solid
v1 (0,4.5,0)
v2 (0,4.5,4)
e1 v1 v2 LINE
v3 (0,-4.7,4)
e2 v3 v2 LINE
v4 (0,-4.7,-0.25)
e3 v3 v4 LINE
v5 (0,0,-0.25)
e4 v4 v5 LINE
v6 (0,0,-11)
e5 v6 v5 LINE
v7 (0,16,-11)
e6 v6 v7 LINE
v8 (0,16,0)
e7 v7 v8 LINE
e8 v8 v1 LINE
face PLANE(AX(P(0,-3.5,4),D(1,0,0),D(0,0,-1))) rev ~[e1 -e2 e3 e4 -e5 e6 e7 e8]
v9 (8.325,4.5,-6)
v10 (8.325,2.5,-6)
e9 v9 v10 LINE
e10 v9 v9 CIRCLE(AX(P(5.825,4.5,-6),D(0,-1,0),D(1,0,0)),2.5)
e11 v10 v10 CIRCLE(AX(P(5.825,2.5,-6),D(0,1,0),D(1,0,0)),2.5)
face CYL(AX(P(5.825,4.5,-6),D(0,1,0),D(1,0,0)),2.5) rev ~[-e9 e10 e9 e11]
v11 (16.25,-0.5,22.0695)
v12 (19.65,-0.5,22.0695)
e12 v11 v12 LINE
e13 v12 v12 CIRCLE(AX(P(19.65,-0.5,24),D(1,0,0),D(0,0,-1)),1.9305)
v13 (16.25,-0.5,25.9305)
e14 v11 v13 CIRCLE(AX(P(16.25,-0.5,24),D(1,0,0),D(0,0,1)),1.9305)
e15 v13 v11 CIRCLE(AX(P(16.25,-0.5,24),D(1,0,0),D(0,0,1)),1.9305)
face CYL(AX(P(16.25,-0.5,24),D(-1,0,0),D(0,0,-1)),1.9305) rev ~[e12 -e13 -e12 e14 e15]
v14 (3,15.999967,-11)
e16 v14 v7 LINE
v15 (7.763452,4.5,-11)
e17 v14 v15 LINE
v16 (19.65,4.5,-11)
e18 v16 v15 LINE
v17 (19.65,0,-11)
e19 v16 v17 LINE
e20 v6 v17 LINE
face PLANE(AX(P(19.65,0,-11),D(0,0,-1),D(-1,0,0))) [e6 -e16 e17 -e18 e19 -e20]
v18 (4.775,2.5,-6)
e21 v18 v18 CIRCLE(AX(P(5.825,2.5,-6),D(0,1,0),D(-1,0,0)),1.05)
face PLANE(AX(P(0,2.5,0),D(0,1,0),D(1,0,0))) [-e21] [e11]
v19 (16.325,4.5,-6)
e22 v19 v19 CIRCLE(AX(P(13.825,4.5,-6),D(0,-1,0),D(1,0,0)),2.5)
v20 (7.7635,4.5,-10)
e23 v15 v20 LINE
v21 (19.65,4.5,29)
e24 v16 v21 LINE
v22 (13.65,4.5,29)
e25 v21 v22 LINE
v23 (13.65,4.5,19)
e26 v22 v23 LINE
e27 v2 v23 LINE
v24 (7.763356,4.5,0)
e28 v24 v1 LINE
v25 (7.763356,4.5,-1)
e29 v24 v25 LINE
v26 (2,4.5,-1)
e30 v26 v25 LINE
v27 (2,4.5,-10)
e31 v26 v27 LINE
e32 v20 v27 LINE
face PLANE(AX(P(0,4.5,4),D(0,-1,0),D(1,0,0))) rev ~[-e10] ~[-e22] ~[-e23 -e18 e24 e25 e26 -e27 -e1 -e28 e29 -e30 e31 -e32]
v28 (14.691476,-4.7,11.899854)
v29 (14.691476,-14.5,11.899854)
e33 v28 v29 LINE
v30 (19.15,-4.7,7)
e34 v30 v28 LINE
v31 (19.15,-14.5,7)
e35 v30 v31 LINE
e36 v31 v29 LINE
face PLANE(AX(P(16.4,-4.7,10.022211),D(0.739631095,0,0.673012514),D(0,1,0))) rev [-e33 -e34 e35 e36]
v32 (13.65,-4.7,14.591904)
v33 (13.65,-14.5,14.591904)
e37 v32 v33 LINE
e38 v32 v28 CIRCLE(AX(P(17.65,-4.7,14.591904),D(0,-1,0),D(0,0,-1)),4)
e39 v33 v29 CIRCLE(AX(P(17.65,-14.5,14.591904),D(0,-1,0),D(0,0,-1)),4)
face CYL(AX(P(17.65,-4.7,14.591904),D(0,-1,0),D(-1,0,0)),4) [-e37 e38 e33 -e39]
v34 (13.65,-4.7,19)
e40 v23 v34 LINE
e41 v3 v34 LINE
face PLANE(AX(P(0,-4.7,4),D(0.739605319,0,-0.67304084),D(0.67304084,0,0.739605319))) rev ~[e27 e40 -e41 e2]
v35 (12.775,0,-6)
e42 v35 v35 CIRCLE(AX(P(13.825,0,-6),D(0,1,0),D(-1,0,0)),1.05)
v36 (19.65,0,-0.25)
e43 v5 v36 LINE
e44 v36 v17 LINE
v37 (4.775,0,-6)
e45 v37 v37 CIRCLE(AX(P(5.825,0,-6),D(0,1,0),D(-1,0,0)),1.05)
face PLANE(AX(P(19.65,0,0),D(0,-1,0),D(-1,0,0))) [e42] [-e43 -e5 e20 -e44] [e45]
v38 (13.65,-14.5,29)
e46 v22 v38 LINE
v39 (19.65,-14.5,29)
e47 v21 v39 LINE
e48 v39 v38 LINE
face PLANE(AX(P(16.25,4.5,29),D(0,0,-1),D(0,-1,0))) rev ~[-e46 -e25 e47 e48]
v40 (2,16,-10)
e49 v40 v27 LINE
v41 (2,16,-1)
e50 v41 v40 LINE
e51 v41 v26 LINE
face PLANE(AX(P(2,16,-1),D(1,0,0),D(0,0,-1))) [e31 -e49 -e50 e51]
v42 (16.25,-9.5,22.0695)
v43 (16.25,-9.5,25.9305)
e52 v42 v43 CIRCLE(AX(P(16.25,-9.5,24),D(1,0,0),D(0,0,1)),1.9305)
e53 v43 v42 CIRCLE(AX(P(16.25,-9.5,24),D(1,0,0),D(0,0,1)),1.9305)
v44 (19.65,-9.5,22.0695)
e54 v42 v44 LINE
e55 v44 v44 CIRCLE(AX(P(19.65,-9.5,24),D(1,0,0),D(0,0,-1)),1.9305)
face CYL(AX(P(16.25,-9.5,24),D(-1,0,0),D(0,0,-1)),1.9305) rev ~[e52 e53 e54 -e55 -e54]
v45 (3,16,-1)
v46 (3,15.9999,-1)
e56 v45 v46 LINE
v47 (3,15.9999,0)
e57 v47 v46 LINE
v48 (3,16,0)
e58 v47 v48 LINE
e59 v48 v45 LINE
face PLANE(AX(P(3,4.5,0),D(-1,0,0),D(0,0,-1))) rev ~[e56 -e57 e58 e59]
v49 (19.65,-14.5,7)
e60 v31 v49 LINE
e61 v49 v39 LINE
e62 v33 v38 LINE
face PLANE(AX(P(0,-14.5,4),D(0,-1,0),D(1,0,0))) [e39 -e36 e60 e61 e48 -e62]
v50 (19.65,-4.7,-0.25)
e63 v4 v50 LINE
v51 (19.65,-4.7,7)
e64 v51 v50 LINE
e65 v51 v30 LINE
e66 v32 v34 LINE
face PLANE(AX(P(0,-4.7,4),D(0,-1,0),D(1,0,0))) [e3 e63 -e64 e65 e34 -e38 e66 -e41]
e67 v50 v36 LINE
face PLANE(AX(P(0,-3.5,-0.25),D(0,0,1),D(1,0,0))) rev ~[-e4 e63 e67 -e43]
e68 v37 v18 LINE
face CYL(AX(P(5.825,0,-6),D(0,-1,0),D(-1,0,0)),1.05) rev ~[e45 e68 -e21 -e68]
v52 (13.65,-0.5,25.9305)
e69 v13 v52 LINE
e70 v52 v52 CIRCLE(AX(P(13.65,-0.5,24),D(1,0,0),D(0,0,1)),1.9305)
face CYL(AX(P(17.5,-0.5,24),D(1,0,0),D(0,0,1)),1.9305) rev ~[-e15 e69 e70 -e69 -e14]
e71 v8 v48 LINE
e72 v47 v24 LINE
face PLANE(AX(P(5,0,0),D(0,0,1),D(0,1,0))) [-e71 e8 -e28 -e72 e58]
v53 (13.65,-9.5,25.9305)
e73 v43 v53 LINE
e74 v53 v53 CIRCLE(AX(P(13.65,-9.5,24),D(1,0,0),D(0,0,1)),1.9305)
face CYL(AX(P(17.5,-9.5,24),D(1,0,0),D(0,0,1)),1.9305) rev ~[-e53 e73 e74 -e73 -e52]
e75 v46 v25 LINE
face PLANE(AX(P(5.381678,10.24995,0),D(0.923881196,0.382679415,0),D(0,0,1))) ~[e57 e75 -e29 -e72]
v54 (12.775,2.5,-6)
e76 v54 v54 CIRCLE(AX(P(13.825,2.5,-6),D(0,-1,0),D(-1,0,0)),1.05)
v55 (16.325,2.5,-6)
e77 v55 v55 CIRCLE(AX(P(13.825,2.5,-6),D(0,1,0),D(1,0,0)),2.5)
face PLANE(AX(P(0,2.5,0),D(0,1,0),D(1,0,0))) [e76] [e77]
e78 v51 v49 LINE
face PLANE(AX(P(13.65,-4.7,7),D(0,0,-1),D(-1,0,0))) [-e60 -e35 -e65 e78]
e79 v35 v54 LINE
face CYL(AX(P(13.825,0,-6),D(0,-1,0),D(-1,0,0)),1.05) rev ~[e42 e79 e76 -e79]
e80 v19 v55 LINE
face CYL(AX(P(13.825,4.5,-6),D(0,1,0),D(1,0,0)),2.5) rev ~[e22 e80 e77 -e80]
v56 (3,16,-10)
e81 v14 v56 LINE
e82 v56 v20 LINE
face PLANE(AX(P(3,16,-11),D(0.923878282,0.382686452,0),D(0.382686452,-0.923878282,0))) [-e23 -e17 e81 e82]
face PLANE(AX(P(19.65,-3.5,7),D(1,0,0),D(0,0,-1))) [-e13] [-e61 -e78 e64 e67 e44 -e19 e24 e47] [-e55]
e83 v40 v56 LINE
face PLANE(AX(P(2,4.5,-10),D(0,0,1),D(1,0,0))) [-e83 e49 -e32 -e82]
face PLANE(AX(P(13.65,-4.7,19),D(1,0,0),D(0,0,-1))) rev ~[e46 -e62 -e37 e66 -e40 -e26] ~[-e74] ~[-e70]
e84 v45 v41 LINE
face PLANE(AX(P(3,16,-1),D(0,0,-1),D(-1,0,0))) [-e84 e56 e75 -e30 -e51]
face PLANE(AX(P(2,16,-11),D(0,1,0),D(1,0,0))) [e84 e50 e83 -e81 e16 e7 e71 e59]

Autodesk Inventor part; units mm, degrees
ref_plane "YZ Plane" through (0, 0, 0) normal (1, 0, 0) x (0, 1, 0)
ref_plane "XZ Plane" through (0, 0, 0) normal (0, 1, 0) x (-1, 0, 0)
ref_plane "XY Plane" through (0, 0, 0) normal (0, 0, 1) x (1, 0, 0)
sketch "Sketch1" plane through (0, 0, 0) normal (0, 1, 0) x (-1, 0, 0)
  line L0 (0, 0) -> (-19.65, 0)
  line L1 (-19.65, 0) -> (-19.65, -12)
  line L2 (-19.65, -12) -> (0, -12)
  line L3 (0, -12) -> (0, 0)
  line L4 (0, 0) -> (0, -6)
  line L5 (0, -6) -> (-5.825, -6)
  line L6 (-5.825, -6) -> (-13.825, -6)
  circle A0 centre (-5.825, -6) radius 1.05
  circle A1 centre (-13.825, -6) radius 1.05
  dimension "d0" = 19.65
  dimension "d1" = 12
  dimension "d2" = 6
  dimension "d3" = 5.825
  dimension "d4" = 8
  dimension "d5" = 2.1
  dimension "d6" = 2.1
extrude "Extrusion1" add sketch "Sketch1" along normal blind 4.5
sketch "Sketch2" plane through (0, 4.5, 0) normal (0, 1, 0) x (1, 0, 0)
  line L0 (0, 0) -> (19.65, 0) projected
  line L1 (0, 0) -> (0, 6)
  line L2 (0, 12) -> (0, 0) projected
  line L3 (0, 6) -> (5.825, 6)
  line L4 (5.825, 6) -> (13.825, 6)
  circle A0 centre (5.825, 6) radius 2.5
  circle A1 centre (13.825, 6) radius 2.5
  dimension "d9" = 5.825
  dimension "d10" = 8
  dimension "d11" = 5
  dimension "d12" = 5
extrude "Extrusion2" cut sketch "Sketch2" against normal blind 2
sketch "Sketch3" plane through (0, 4.5, 0) normal (0, 1, 0) x (1, 0, 0)
  line L0 (19.65, 12) -> (0, 12) projected
  line L1 (0, 0) -> (3, 0)
  line L2 (3, 0) -> (3, 12)
  line L3 (3, 12) -> (0, 12)
  line L4 (0, 12) -> (0, 0)
  dimension "d15" = 3
extrude "Extrusion3" add sketch "Sketch3" along normal blind 11.5
sketch "Sketch4" plane through (0, 16, 0) normal (0, 1, 0) x (1, 0, 0)
  line L0 (0, 0) -> (3, 0) projected
  line L1 (0, 0) -> (3, 0)
  line L2 (3, 0) -> (3, 1)
  line L3 (3, 0) -> (3, 12) projected
  line L4 (3, 1) -> (2, 1)
  line L5 (2, 1) -> (2, 11)
  line L6 (2, 11) -> (3, 11)
  line L7 (3, 1) -> (3, 11)
  dimension "d18" = 1
  dimension "d19" = 1
  dimension "d20" = 10
extrude "Extrusion4" cut sketch "Sketch4" against normal blind 11.5
sketch "Sketch6" plane through (0, 0, 0) normal (0, 0, 1) x (1, 0, 0)
  line L0 (0, 0) -> (19.65, 0) projected
  line L1 (0, 0) -> (5, 0)
  line L2 (5, 0) -> (5, 4.5)
  line L3 (3.325, 4.5) -> (8.325, 4.5) projected
  line L4 (19.65, 0) -> (19.65, 4.5) projected
  line L5 (19.65, 4.5) -> (19.65, 0)
  line L6 (19.65, 0) -> (5, 0)
  line L7 (5, 4.5) -> (19.65, 4.5)
  line L8 (19.65, 0) -> (5, 0)
  line L9 (19.65, 4.5) -> (19.65, -3.5)
  line L10 (5, 4.5) -> (-3, 4.5)
  line L11 (3, 4.5) -> (19.65, 4.5) projected
  line L12 (5, 4.5) -> (5, -3.5)
  line L13 (5, -3.5) -> (19.65, -3.5)
  dimension "d24" = 5
  dimension "d25" = 8
  dimension "d26" = 8
  dimension "d27" = 8
extrude "Extrusion5" add sketch "Sketch6" along normal blind 2
sketch "Sketch7" plane through (0, 0, 2) normal (0, 0, 1) x (1, 0, 0)
  line L0 (5, 0) -> (5, -3.5) projected
  line L1 (5, -3.5) -> (11, -3.5)
  line L2 (11, -3.5) -> (11, 4.5)
  line L3 (11, 4.5) -> (5, 4.5)
  line L4 (5, 4.5) -> (5, -3.5)
  line L5 (5, -3.5) -> (19.65, -3.5) projected
  line L6 (5, -3.5) -> (11, -3.5)
  line L7 (11, -3.5) -> (11, -14.5)
  line L8 (11, -14.5) -> (5, -14.5)
  line L9 (5, -14.5) -> (5, -3.5)
  point P0 (0, 0)
  dimension "d30" = 6
  dimension "d31" = 8
  dimension "d32" = 6
  dimension "d33" = 11
extrude "Extrusion6" add sketch "Sketch7" along normal blind 27
sketch "Sketch8" plane through (11, -14.5, 2) normal (1, 0, 0) x (0, 0, -1)
  line L0 (0, 11) -> (0, 0) projected
  line L1 (0, 0) -> (-27, 0)
  line L2 (0, 0) -> (-27, 0) projected
  line L3 (-27, 0) -> (-27, 5)
  line L4 (2, 19) -> (-27, 19) projected
  circle A0 centre (-27, 5) radius 2
  line L5 (0, 19) -> (-27, 19)
  line L6 (-27, 19) -> (-27, 14)
  circle A1 centre (-27, 14) radius 2
  line L7 (-27, 14) -> (-22, 14)
  line L8 (-27, 5) -> (-22, 5)
  circle A2 centre (-22, 14) radius 1.9305
  circle A3 centre (-22, 5) radius 1.9305
  point P0 (2, 14.5)
  point P1 (-25, 14)
  point P2 (-27, 16)
  point P3 (-25, 5)
  point P4 (-27, 3)
  dimension "d36" = 27
  dimension "d37" = 5
  dimension "d39" = 4
  dimension "d41" = 27
  dimension "d42" = 5
  dimension "d43" = 4
  dimension "d44" = 5
  dimension "d45" = 5
  dimension "d46" = 3.861
  dimension "d47" = 3.861
sketch "Sketch10" plane through (11, -14.5, 2) normal (1, 0, 0) x (0, 0, -1)
  line L0 (0, 0) -> (-27, 0) projected
  line L1 (0, 0) -> (-5, 0)
  line L2 (-5, 0) -> (-5, 11)
  line L3 (-5, 11) -> (0, 11)
  line L4 (0, 11) -> (0, 0)
  point P0 (2, 14.5)
  point P1 (-5, 0)
  dimension "d52" = 5
  dimension "d53" = 11
extrude "Extrusion9" cut sketch "Sketch10" against normal blind 20
sketch "Sketch11" plane through (11, -3.5, 2) normal (1, 0, 0) x (0, 0, -1)
  line L0 (-27, 8) -> (0, 8)
  line L1 (0, 8) -> (0, -11)
  line L2 (0, -11) -> (-27, -11)
  line L3 (-27, -11) -> (-27, 8)
  line L4 (-5, 0) -> (0, 0) projected
  line L5 (-5, 0) -> (0, 0)
  line L6 (0, 0) -> (0, -11)
  line L7 (0, -11) -> (-5, -11)
  line L8 (-5, -11) -> (-5, 0)
  point P0 (2, 3.5)
  dimension "d56" = 27
  dimension "d57" = 19
extrude "Extrusion10" add sketch "Sketch11" along normal blind 16 contours L0 L1 L4 L8 L2 L3
sketch "Sketch13" plane through (5, -3.5, 0) normal (-1, 0, 0) x (0, 0, 1)
  line L0 (0, 3.5) -> (0, 8) projected
  line L1 (0, 8) -> (30.196, 8)
  line L2 (30.196, 8) -> (30.196, -11.8084)
  line L3 (30.196, -11.8084) -> (0, -11.8084)
  line L4 (0, -11.8084) -> (0, 8)
extrude "Extrusion12" cut sketch "Sketch13" against normal blind 12.5
extrude "Extrusion13" cut sketch "Sketch8" along normal blind 30 contours A2 | A3
sketch "Sketch14" plane through (0, 0, -12) normal (-1, 0, 0) x (0, 0, 1)
  line L0 (12, 4.5) -> (12, 16) projected
  line L1 (12, 4.5) -> (16, 4.5)
  line L2 (14, 4.5) -> (41, 4.5) projected
  line L3 (12, 4.5) -> (12, 0) projected
  line L4 (16, 4.5) -> (12, 4.5)
  line L5 (12, 4.5) -> (12, 0)
  line L6 (12, 0) -> (16, 0)
  line L7 (16, 0) -> (16, 4.5)
  line L8 (16, 0) -> (12, 0)
  line L9 (12, 0) -> (12, -3.5)
  line L10 (12, -3.5) -> (16, -3.5)
  line L11 (16, -3.5) -> (16, 0)
  dimension "d68" = 4
  dimension "d69" = 3.5
extrude "Extrusion14" add sketch "Sketch14" against normal blind 27
sketch "Sketch15" plane through (27, -3.5, 2) normal (1, 0, 0) x (0, 0, -1)
  line L0 (-27.7224, 9.1153) -> (2, 9.1153)
  line L1 (2, 9.1153) -> (2, -11.9629)
  line L2 (2, -11.9629) -> (-27.7224, -11.9629)
  line L3 (-27.7224, -11.9629) -> (-27.7224, 9.1153)
  point P0 (2, 3.5)
extrude "Extrusion15" cut sketch "Sketch15" against normal blind 3.5
sketch "Sketch16" plane through (0, 0, 0) normal (0, 0, -1) x (-1, 0, 0)
  line L0 (-23.5, 4.5) -> (-23.5, -3.5) projected
  line L1 (-19.65, 0) -> (0, 0) projected
  line L2 (-23.5, 4.5) -> (-19.65, 4.5)
  line L3 (-19.65, 4.5) -> (-19.65, 0)
  line L4 (-19.65, 0) -> (-23.5, 0)
  line L5 (-23.5, 0) -> (-23.5, 4.5)
  line L6 (0, -3.5) -> (-23.5, -3.5) projected
  line L7 (-23.5, -3.5) -> (0, -3.5)
  line L8 (0, -3.5) -> (0, 0)
  line L9 (0, 0) -> (-23.5, 0)
  line L10 (-23.5, 0) -> (-23.5, -3.5)
extrude "Extrusion16" cut sketch "Sketch16" against normal blind 0.25
chamfer "Chamfer2" distance 11.5 angle 22.5 1 edges at (3, 4.5, -0.5) measured on face at (3, 8.3333, -0.6667)
chamfer "Chamfer3" distance 11.5 angle 22.5 1 edges at (3, 4.5, -11.5) measured on face at (3, 8.3333, -11.3333)
sketch "Sketch17" plane through (17.5, -3.5, 0) normal (-1, 0, 0) x (0, 0, 1)
  line L0 (4, 8) -> (0, 8) projected
  line L1 (4, 8) -> (29, 8) projected
  line L2 (4, 8) -> (29, 8)
  line L3 (29, -11) -> (7, -11) projected
  line L4 (29, 8) -> (29, -11)
  line L5 (29, -11) -> (7, -11)
  line L6 (7, -11) -> (7, 0) projected
  line L7 (7, -11) -> (7, 0)
  line L8 (7, 0) -> (4, 0) projected
  line L9 (7, 0) -> (4, 0)
  line L10 (4, 0) -> (4, 8) projected
  line L11 (4, 0) -> (4, 8)
  circle A0 centre (24, 3) radius 1.9305 projected
  circle A1 centre (24, 3) radius 1.9305
  circle A2 centre (24, -6) radius 1.9305 projected
  circle A3 centre (24, -6) radius 1.9305
  point P0 (0, 3.5)
extrude "Extrusion17" add sketch "Sketch17" along normal blind 7.75
sketch "Sketch19" plane through (19.65, 0, -12) normal (1, 0, 0) x (0, 0, -1)
  line L0 (3.0047, 17.6779) -> (-43.6886, 17.6779)
  line L1 (-43.6886, 17.6779) -> (-43.6886, -24.1526)
  line L2 (-43.6886, -24.1526) -> (3.0047, -24.1526)
  line L3 (3.0047, -24.1526) -> (3.0047, 17.6779)
  point P0 (-12, 0)
extrude "Extrusion18" cut sketch "Sketch19" along normal blind 7.75
sketch "Sketch20" plane through (19.65, 0, -12) normal (1, 0, 0) x (0, 0, -1)
  line L0 (-16, -3.5) -> (-19, -3.5) projected
  line L1 (-41, 4.5) -> (-16, 4.5) projected
  line L2 (-16, -3.5) -> (-41, -3.5)
  line L3 (-41, -3.5) -> (-41, 4.5)
  line L4 (-41, 4.5) -> (-16, 4.5)
  line L5 (-16, 4.5) -> (-16, -3.5)
  line L6 (-19, -3.5) -> (-19, -14.5) projected
  line L7 (0, 4.5) -> (-41, 4.5) projected
  line L8 (-19, -14.5) -> (-41, -14.5)
  line L9 (-41, -14.5) -> (-41, 4.5)
  line L10 (-41, 4.5) -> (-19, 4.5)
  line L11 (-19, 4.5) -> (-19, -14.5)
  point P0 (-12, 0)
extrude "Extrusion19" cut sketch "Sketch20" against normal blind 3.4
sketch "Sketch22" plane through (9.75, -3.5, 0) normal (-1, 0, 0) x (0, 0, 1)
  line L0 (29, 8) -> (4, 8) projected
  line L1 (29, -11) -> (29, 8) projected
  line L2 (4, 8) -> (29, 8)
  line L3 (29, 8) -> (29, -11)
  line L4 (29, -11) -> (4, -11)
  line L5 (4, -11) -> (4, 8)
  point P0 (0, 3.5)
extrude "Extrusion21" cut sketch "Sketch22" against normal blind 0.5
chamfer "Chamfer6" distance 6 angle 45 1 edges at (10.25, 0.5, 4)
sketch "Sketch23" plane through (10.25, -3.5, 0) normal (-1, 0, 0) x (0, 0, 1)
  line L0 (0.25, 0) -> (4, 0) projected
  line L1 (29, -11) -> (0.25, -11)
  line L2 (0.25, -11) -> (0.25, 0)
  line L3 (0.25, 0) -> (29, 0)
  line L4 (29, 0) -> (29, -11)
  point P0 (0, 3.5)
extrude "Extrusion22" cut sketch "Sketch23" along normal blind 6
chamfer "Chamfer7" distance 3 angle 45 1 edges at (10.25, -9, 7)
sketch "Sketch24" plane through (2, 4.5, -11) normal (0, 0, 1) x (1, 0, 0)
  line L0 (0, 11.5) -> (0, 0) projected
  line L1 (0, 11.5) -> (1, 11.5) projected
  line L2 (0, 11.5) -> (1, 11.5)
  line L3 (1, 11.5) -> (5.7635, 0) projected
  line L4 (1, 11.5) -> (5.7635, 0)
  line L5 (5.7635, 0) -> (0, 0)
  line L6 (0, 0) -> (0, 11.5)
  point P0 (-2, -4.5)
extrude "Extrusion23" add sketch "Sketch24" along normal blind 1
sketch "Sketch25" plane through (19.65, 0, -12) normal (0, 0, -1) x (-1, 0, 0)
  line L0 (11.8865, 4.5) -> (16.65, 16) projected
  line L1 (11.8865, 4.5) -> (21.5602, 4.5)
  line L2 (21.5602, 4.5) -> (21.5602, 16.6717)
  line L3 (21.5602, 16.6717) -> (11.8865, 16.6717)
  line L4 (11.8865, 16.6717) -> (11.8865, 4.5)
  point P0 (19.65, 0)
extrude "Extrusion24" cut sketch "Sketch25" against normal blind 1
sketch "Sketch26" plane through (19.65, 0, -12) normal (0, 0, -1) x (-1, 0, 0)
  line L0 (23.0227, -5.5896) -> (-3.5888, -5.5896)
  line L1 (-3.5888, -5.5896) -> (-3.5888, 1.5983)
  line L2 (23.0227, 1.5983) -> (23.0227, -5.5896)
  line L3 (23.0227, -5.5896) -> (-3.178, -5.5896)
  line L4 (-3.178, -5.5896) -> (-3.178, 11.4907)
  line L5 (-3.178, 11.4907) -> (23.0227, 11.4907)
  line L6 (23.0227, 11.4907) -> (23.0227, -5.5896)
  point P0 (19.65, 0)
extrude "Extrusion25" cut sketch "Sketch26" against normal blind 1
sketch "Sketch27" plane through (0, 0, 0.25) normal (0, 0, -1) x (-1, 0, 0)
  line L0 (-19.65, 0) -> (0, 0) projected
  line L1 (-19.65, -3.5) -> (-16.25, -3.5) projected
  line L2 (0, 0) -> (-19.65, 0)
  line L3 (-19.65, 0) -> (-19.65, -3.5)
  line L4 (-19.65, -3.5) -> (0, -3.5)
  line L5 (0, -3.5) -> (0, 0)
extrude "Extrusion26" add sketch "Sketch27" along normal blind 0.25
sketch "Sketch28" plane through (0, 0, 0) normal (0, 0, -1) x (-1, 0, 0)
  line L0 (0, 0) -> (-19.65, 0) projected
  line L1 (-19.65, 0) -> (-19.65, -3.5) projected
  line L2 (0, 0) -> (-19.65, 0)
  line L3 (-19.65, 0) -> (-19.65, -3.5)
  line L4 (-19.65, -3.5) -> (0, -3.5)
  line L5 (0, -3.5) -> (0, 0)
extrude "Extrusion27" add sketch "Sketch28" along normal blind 0.25
sketch "Sketch29" plane through (16.25, 0, -12) normal (1, 0, 0) x (0, 0, -1)
  line L0 (-16, -3.5) -> (-16, 4.5) projected
  line L1 (-19, -14.5) -> (-41, -14.5) projected
  line L2 (-16, 4.5) -> (-41, 4.5)
  line L3 (-41, 4.5) -> (-41, -14.5)
  line L4 (-41, -14.5) -> (-16, -14.5)
  line L5 (-16, -14.5) -> (-16, 4.5)
  line L6 (-19, -3.5) -> (-19, -14.5) projected
  line L7 (-19, -3.5) -> (-16, -3.5)
  line L8 (-16, -3.5) -> (-16, -14.5)
  line L9 (-16, -14.5) -> (-19, -14.5)
  line L10 (-19, -14.5) -> (-19, -3.5)
  circle A0 centre (-36, -0.5) radius 1.9305 projected
  circle A1 centre (-36, -0.5) radius 1.9305
  circle A2 centre (-36, -9.5) radius 1.9305 projected
  circle A3 centre (-36, -9.5) radius 1.9305
  point P0 (-12, 0)
extrude "Extrusion28" add sketch "Sketch29" along normal blind 3.4 contours L7 L6 L1 L3 L2 L0
sketch "Sketch30" plane through (0, -3.5, 4) normal (0, -1, 0) x (1, 0, 0)
  line L0 (19.65, 3) -> (19.65, -4.25) projected
  line L1 (0, -15) -> (0, -4.25) projected
  line L2 (0, 3) -> (0, -4.25)
  line L3 (0, -4.25) -> (19.65, -4.25)
  line L4 (19.65, -4.25) -> (19.65, 3)
  line L5 (10.25, 6) -> (13.25, 3) projected
  line L6 (13.25, 3) -> (10.25, 6)
  line L7 (10.25, 6) -> (7.25, 3)
  line L8 (10.25, 6) -> (4.25, 0) projected
  line L9 (0, 0) -> (4.25, 0) projected
  line L10 (7.25, 3) -> (4.25, 0)
  line L11 (19.65, 3) -> (13.25, 3)
  line L12 (7.25, 3) -> (0, 3)
  point P0 (0, -4)
extrude "Extrusion29" add sketch "Sketch30" along normal blind 1.2 contours L0 L3 L2 L9 L8 L7 L5 L11
sketch "Sketch31" plane through (10.25, -3.5, 0) normal (-1, 0, 0) x (0, 0, 1)
  line L0 (29, 8) -> (29, -11) projected
  line L1 (29, -11) -> (10, -11) projected
  line L2 (29, 8) -> (19, 8)
  line L3 (19, 8) -> (19, -11)
  line L4 (19, -11) -> (29, -11)
  line L5 (29, -11) -> (29, 8)
  point P0 (0, 3.5)
  dimension "d126" = 10
extrude "Extrusion30" cut sketch "Sketch31" against normal blind 3.4
sketch "Sketch32" plane through (0, 4.5, 0) normal (0, 1, 0) x (1, 0, 0)
  line L0 (13.65, -19) -> (10.25, -19) projected
  line L1 (10.25, -19) -> (10.25, -10) projected
  line L2 (13.65, -19) -> (10.25, -10)
  line L3 (10.25, -10) -> (7.9334, -20.7068)
  line L4 (7.9334, -20.7068) -> (13.65, -19)
  point P0 (0, 0)
extrude "Extrusion31" cut sketch "Sketch32" against normal blind 20 contours L0 L1 L2
sketch "Sketch38" plane through (0, -4.7, 4) normal (0, -1, 0) x (1, 0, 0)
  line L0 (13.65, 15) -> (13.65, 3)
  line L1 (13.25, 3) -> (19.65, 3) projected
  line L2 (13.65, 3) -> (6.6933, 3)
  line L3 (10.25, 6) -> (13.65, 15) projected
  line L4 (6.6933, 3) -> (13.65, 15)
  point P0 (0, -4)
extrude "Extrusion35" cut sketch "Sketch38" along normal blind 20
sketch "Sketch39" plane through (0, -4.7, 4) normal (0, -1, 0) x (1, 0, 0)
  line L0 (10.25, 6) -> (13.65, 15) projected
  line L1 (10.25, 6) -> (10.9568, 7.8709)
  line L2 (10.9568, 7.8709) -> (13.65, 7.8709)
  line L3 (13.65, 3) -> (13.65, 15) projected
  line L4 (13.65, 3) -> (10.9568, 3)
  line L5 (10.9568, 3) -> (10.9568, 7.8709)
  line L6 (10.9568, 7.8709) -> (13.65, 7.8709)
  line L7 (13.65, 7.8709) -> (13.65, 3)
  point P0 (0, -4)
  dimension "d150" = 2
extrude "Extrusion36" add sketch "Sketch39" along normal blind 9.8 contours L2 L3 L4 L5
sketch "Sketch40" plane through (0, -4.7, 4) normal (0, -1, 0) x (1, 0, 0)
  line L0 (10.25, 6) -> (10.9568, 7.8709) projected
  line L1 (13.65, 25) -> (13.65, 7.8709) projected
  line L2 (10.9568, 7.8709) -> (13.65, 7.8709)
  line L3 (13.65, 15) -> (13.65, 25) projected
  line L4 (13.65, 7.8709) -> (13.65, 15)
  line L5 (10.9568, 7.8709) -> (13.65, 15) projected
  line L6 (13.65, 15) -> (10.9568, 7.8709)
  point P0 (0, -4)
extrude "Extrusion37" add sketch "Sketch40" along normal blind 9.8
sketch "Sketch42" plane through (0, -4.7, 4) normal (0, -1, 0) x (1, 0, 0)
  line L0 (4.25, 0) -> (0, 0) projected
  line L1 (10.25, 6) -> (13.65, 15) projected
  line L2 (0, 0) -> (13.65, 15)
  line L3 (13.65, 15) -> (13.65, 4.5)
  line L4 (13.65, 4.5) -> (6.0124, 0)
  line L5 (0, 0) -> (4.25, 0) projected
  line L6 (6.0124, 0) -> (0, 0)
  point P0 (0, -4)
extrude "Extrusion38" add sketch "Sketch42" against normal blind 9.2
sketch "Sketch45" plane through (19.65, -14.5, 7) normal (0, -1, 0) x (1, 0, 0)
  line L0 (-6, 12) -> (-19.65, -3) projected
  line L1 (-6, 12) -> (-11.8966, 12)
  line L2 (-11.8966, 12) -> (-11.8966, -1.0489)
  line L3 (-11.8966, -1.0489) -> (-6, -1.0489)
  line L4 (-6, -1.0489) -> (-6, 12)
  point P0 (-19.65, -7)
  point P1 (-11.8966, 5.5202)
extrude "Extrusion40" cut sketch "Sketch45" against normal blind 9.8 contours L4 L3 L2 L0
chamfer "Chamfer12" distance 5.5 angle 47.7 1 edges at (13.65, -9.6, 7) measured on face at (17.65, -11.2333, 7)
fillet "Fillet6" radius 4 1 edges at (13.65, -9.6, 13.0444)
properties part number "Finger_mount"
